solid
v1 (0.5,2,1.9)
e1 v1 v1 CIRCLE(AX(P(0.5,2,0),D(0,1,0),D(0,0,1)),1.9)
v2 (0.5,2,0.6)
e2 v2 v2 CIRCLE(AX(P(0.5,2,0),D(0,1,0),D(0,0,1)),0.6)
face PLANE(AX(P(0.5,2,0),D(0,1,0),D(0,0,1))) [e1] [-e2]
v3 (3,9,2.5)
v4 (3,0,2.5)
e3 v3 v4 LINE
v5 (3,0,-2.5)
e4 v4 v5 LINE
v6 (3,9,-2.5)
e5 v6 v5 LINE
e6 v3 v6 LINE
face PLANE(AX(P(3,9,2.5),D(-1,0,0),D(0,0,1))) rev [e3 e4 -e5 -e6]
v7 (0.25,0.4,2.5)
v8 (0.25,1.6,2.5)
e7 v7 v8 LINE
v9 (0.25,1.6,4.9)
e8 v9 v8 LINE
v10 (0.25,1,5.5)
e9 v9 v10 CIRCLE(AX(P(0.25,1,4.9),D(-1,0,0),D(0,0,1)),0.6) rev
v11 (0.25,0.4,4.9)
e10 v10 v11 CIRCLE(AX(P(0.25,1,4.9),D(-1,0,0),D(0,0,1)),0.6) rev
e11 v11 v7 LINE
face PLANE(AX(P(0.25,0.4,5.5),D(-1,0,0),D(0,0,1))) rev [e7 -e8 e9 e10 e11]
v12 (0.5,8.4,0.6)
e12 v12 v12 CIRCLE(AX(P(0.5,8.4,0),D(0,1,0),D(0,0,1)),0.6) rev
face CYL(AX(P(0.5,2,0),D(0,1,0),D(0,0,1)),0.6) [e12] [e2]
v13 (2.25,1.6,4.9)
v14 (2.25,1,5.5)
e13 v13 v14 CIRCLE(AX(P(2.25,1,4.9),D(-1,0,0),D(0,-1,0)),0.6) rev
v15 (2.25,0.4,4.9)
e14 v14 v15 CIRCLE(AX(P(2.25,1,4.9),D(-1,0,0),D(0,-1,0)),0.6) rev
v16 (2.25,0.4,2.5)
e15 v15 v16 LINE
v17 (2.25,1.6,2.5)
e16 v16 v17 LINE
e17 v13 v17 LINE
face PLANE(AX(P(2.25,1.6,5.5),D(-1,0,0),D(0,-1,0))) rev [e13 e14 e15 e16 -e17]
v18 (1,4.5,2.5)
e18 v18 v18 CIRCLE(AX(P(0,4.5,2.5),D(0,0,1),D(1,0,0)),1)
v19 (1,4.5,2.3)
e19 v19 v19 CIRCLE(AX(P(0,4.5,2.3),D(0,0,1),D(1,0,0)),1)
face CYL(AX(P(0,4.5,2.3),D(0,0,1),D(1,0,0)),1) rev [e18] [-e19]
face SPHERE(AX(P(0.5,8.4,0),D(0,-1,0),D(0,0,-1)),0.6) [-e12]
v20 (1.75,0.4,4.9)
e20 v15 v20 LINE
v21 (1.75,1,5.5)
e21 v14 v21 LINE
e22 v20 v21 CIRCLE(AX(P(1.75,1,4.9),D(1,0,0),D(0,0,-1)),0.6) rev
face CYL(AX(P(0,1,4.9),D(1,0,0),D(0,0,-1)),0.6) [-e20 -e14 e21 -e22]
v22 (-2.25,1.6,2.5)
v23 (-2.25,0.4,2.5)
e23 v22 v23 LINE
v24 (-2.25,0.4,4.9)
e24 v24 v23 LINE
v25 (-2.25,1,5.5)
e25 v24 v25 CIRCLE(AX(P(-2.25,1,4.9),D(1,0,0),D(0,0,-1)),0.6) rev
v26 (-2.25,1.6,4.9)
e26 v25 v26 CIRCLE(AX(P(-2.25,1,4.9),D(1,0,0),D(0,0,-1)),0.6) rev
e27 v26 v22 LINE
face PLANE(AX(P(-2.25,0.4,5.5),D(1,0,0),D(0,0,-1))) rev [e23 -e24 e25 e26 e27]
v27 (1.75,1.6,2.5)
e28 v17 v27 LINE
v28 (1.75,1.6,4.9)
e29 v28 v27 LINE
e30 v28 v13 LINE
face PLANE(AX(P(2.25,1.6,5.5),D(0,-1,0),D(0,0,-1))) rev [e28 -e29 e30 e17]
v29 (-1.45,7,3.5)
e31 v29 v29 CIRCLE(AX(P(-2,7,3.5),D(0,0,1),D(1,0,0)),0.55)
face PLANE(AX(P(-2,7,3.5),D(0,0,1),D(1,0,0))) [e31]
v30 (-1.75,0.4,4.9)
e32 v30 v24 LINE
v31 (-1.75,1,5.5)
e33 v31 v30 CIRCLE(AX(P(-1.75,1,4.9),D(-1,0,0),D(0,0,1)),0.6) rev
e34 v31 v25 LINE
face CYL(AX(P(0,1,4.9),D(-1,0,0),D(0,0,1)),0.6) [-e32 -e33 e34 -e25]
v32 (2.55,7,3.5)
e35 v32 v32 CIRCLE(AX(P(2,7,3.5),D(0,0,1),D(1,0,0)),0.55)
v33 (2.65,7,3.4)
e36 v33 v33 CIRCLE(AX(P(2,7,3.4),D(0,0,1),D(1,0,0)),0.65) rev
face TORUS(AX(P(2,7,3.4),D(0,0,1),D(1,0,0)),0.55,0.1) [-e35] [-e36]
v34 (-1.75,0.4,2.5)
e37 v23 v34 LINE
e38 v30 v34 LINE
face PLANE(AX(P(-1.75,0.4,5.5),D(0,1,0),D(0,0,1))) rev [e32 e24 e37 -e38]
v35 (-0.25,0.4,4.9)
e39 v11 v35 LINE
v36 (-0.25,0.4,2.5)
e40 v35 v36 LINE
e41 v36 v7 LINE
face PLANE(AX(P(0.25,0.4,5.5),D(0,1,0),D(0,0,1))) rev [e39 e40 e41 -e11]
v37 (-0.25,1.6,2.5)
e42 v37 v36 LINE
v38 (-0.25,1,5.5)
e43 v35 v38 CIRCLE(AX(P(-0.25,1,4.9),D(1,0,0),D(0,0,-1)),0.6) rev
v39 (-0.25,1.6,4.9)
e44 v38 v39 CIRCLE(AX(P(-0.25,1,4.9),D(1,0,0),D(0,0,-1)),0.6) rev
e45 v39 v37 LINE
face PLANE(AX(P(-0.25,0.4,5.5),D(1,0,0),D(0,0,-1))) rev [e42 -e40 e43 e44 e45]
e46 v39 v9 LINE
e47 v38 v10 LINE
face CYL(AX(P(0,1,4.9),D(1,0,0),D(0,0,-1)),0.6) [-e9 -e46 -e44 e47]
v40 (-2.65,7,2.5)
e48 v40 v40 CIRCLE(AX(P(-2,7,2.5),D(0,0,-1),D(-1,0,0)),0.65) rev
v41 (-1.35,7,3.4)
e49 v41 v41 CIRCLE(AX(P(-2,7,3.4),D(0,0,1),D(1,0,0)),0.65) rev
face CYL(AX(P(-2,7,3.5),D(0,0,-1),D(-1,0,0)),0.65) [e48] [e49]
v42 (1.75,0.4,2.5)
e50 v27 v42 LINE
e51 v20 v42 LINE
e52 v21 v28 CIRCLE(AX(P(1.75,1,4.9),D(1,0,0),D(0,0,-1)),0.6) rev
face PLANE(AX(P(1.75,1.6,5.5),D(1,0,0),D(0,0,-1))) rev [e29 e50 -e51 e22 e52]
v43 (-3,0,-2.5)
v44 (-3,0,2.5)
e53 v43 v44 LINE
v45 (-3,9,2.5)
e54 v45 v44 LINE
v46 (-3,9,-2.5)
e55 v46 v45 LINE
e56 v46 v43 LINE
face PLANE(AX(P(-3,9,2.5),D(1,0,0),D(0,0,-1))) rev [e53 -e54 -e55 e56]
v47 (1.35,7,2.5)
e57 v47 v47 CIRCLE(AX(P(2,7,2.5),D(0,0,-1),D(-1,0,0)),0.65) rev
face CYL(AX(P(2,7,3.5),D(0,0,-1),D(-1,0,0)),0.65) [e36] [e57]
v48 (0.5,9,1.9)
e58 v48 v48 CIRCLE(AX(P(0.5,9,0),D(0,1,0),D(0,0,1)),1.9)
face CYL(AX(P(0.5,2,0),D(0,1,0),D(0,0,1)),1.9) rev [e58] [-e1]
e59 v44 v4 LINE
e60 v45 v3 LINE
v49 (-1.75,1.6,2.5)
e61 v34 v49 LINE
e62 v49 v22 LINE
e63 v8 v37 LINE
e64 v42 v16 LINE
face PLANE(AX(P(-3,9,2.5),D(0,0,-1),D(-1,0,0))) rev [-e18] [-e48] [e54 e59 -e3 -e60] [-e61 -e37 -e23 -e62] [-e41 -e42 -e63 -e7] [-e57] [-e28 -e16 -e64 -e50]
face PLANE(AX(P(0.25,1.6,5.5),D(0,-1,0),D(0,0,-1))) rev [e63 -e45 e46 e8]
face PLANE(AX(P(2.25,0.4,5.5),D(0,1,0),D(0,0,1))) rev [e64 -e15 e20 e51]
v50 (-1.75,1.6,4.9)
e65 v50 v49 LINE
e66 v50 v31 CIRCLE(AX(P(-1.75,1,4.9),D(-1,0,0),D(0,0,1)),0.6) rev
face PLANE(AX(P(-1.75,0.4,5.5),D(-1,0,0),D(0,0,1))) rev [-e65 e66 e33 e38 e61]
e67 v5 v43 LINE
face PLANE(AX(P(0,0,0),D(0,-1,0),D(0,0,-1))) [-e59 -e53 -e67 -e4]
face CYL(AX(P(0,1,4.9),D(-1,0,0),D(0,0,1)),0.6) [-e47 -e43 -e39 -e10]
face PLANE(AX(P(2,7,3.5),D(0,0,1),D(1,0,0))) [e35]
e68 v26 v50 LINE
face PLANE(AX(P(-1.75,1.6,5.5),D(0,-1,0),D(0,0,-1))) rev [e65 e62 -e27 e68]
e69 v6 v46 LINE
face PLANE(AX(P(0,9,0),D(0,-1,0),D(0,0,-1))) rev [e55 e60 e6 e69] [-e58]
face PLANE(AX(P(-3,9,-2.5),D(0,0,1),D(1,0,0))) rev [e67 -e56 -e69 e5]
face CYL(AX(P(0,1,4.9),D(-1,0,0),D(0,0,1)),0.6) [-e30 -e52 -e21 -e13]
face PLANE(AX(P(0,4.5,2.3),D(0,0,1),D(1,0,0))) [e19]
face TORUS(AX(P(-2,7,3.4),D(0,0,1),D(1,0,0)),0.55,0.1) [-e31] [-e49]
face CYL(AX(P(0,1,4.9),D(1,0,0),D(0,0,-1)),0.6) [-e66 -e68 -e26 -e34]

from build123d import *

# Parameters (mm, degrees)
SKETCH2_W           = 6
SKETCH2_H           = 5
BOSS_EXTRUDE1_DEPTH = 9
SKETCH3_R           = 1.9
SKETCH3_R_2         = 0.6
CUT_EXTRUDE1_DEPTH  = 7
FILLET1_R           = 0.6
SKETCH4_W           = 0.5
SKETCH4_H           = 1.2
BOSS_EXTRUDE2_DEPTH = 3
FILLET2_R           = 0.6
SKETCH5_R           = 0.65
BOSS_EXTRUDE3_DEPTH = 1
FILLET3_R           = 0.1
SKETCH6_R           = 1
CUT_EXTRUDE2_DEPTH  = 0.2


with BuildPart() as part:
    # Sketch2 → Boss-Extrude1 (new body)
    with BuildSketch(Plane(origin=(0, 0, 0), x_dir=(1, 0, 0), z_dir=(0, 1, 0))):
        Rectangle(SKETCH2_W, SKETCH2_H)
    extrude(amount=BOSS_EXTRUDE1_DEPTH)

    # Sketch3 → Cut-Extrude1 (cut)
    with BuildSketch(Plane(origin=(0, 9, 0), x_dir=(1, 0, 0), z_dir=(0, 1, 0))):
        with Locations(Location((0.5, 0, 0), (0, 0, 270))):
            Circle(SKETCH3_R)
        with Locations(Location((0.5, 0, 0), (0, 0, 270))):
            Circle(SKETCH3_R_2, mode=Mode.SUBTRACT)
    extrude(amount=-CUT_EXTRUDE1_DEPTH, mode=Mode.SUBTRACT)

    # Fillet1
    fillet1_edges = [part.edges().sort_by_distance(p)[0] for p in [
        (0.5, 9, -0.6),
    ]]
    fillet(fillet1_edges, radius=FILLET1_R)

    # Sketch4 → Boss-Extrude2 (add)
    with BuildSketch(Plane.XY.offset(2.5)):
        with Locations((2, 1)):
            Rectangle(SKETCH4_W, SKETCH4_H)
        with Locations((0, 1)):
            Rectangle(SKETCH4_W, SKETCH4_H)
        with Locations((-2, 1)):
            Rectangle(SKETCH4_W, SKETCH4_H)
    extrude(amount=BOSS_EXTRUDE2_DEPTH)

    # Fillet2
    fillet2_edges = [part.edges().sort_by_distance(p)[0] for p in [
        (-2, 0.4, 5.5),
        (-2, 1.6, 5.5),
        (0, 1.6, 5.5),
        (0, 0.4, 5.5),
        (2, 0.4, 5.5),
        (2, 1.6, 5.5),
    ]]
    fillet(fillet2_edges, radius=FILLET2_R - 0.0001)  # a hair under: the kernel refuses the full size

    # Sketch5 → Boss-Extrude3 (add)
    with BuildSketch(Plane.XY.offset(2.5)):
        with Locations(Location((2, 7, 0), (0, 0, 180))):
            Circle(SKETCH5_R)
        with Locations(Location((-2, 7, 0), (0, 0, 180))):
            Circle(SKETCH5_R)
    extrude(amount=BOSS_EXTRUDE3_DEPTH)

    # Fillet3
    fillet3_edges = [part.edges().sort_by_distance(p)[0] for p in [
        (2.65, 7, 3.5),
        (-1.35, 7, 3.5),
    ]]
    fillet(fillet3_edges, radius=FILLET3_R)

    # Sketch6 → Cut-Extrude2 (cut)
    with BuildSketch(Plane.XY.offset(2.5)):
        with Locations((0, 4.5)):
            Circle(SKETCH6_R)
    extrude(amount=-CUT_EXTRUDE2_DEPTH, mode=Mode.SUBTRACT)


solid = part.part
